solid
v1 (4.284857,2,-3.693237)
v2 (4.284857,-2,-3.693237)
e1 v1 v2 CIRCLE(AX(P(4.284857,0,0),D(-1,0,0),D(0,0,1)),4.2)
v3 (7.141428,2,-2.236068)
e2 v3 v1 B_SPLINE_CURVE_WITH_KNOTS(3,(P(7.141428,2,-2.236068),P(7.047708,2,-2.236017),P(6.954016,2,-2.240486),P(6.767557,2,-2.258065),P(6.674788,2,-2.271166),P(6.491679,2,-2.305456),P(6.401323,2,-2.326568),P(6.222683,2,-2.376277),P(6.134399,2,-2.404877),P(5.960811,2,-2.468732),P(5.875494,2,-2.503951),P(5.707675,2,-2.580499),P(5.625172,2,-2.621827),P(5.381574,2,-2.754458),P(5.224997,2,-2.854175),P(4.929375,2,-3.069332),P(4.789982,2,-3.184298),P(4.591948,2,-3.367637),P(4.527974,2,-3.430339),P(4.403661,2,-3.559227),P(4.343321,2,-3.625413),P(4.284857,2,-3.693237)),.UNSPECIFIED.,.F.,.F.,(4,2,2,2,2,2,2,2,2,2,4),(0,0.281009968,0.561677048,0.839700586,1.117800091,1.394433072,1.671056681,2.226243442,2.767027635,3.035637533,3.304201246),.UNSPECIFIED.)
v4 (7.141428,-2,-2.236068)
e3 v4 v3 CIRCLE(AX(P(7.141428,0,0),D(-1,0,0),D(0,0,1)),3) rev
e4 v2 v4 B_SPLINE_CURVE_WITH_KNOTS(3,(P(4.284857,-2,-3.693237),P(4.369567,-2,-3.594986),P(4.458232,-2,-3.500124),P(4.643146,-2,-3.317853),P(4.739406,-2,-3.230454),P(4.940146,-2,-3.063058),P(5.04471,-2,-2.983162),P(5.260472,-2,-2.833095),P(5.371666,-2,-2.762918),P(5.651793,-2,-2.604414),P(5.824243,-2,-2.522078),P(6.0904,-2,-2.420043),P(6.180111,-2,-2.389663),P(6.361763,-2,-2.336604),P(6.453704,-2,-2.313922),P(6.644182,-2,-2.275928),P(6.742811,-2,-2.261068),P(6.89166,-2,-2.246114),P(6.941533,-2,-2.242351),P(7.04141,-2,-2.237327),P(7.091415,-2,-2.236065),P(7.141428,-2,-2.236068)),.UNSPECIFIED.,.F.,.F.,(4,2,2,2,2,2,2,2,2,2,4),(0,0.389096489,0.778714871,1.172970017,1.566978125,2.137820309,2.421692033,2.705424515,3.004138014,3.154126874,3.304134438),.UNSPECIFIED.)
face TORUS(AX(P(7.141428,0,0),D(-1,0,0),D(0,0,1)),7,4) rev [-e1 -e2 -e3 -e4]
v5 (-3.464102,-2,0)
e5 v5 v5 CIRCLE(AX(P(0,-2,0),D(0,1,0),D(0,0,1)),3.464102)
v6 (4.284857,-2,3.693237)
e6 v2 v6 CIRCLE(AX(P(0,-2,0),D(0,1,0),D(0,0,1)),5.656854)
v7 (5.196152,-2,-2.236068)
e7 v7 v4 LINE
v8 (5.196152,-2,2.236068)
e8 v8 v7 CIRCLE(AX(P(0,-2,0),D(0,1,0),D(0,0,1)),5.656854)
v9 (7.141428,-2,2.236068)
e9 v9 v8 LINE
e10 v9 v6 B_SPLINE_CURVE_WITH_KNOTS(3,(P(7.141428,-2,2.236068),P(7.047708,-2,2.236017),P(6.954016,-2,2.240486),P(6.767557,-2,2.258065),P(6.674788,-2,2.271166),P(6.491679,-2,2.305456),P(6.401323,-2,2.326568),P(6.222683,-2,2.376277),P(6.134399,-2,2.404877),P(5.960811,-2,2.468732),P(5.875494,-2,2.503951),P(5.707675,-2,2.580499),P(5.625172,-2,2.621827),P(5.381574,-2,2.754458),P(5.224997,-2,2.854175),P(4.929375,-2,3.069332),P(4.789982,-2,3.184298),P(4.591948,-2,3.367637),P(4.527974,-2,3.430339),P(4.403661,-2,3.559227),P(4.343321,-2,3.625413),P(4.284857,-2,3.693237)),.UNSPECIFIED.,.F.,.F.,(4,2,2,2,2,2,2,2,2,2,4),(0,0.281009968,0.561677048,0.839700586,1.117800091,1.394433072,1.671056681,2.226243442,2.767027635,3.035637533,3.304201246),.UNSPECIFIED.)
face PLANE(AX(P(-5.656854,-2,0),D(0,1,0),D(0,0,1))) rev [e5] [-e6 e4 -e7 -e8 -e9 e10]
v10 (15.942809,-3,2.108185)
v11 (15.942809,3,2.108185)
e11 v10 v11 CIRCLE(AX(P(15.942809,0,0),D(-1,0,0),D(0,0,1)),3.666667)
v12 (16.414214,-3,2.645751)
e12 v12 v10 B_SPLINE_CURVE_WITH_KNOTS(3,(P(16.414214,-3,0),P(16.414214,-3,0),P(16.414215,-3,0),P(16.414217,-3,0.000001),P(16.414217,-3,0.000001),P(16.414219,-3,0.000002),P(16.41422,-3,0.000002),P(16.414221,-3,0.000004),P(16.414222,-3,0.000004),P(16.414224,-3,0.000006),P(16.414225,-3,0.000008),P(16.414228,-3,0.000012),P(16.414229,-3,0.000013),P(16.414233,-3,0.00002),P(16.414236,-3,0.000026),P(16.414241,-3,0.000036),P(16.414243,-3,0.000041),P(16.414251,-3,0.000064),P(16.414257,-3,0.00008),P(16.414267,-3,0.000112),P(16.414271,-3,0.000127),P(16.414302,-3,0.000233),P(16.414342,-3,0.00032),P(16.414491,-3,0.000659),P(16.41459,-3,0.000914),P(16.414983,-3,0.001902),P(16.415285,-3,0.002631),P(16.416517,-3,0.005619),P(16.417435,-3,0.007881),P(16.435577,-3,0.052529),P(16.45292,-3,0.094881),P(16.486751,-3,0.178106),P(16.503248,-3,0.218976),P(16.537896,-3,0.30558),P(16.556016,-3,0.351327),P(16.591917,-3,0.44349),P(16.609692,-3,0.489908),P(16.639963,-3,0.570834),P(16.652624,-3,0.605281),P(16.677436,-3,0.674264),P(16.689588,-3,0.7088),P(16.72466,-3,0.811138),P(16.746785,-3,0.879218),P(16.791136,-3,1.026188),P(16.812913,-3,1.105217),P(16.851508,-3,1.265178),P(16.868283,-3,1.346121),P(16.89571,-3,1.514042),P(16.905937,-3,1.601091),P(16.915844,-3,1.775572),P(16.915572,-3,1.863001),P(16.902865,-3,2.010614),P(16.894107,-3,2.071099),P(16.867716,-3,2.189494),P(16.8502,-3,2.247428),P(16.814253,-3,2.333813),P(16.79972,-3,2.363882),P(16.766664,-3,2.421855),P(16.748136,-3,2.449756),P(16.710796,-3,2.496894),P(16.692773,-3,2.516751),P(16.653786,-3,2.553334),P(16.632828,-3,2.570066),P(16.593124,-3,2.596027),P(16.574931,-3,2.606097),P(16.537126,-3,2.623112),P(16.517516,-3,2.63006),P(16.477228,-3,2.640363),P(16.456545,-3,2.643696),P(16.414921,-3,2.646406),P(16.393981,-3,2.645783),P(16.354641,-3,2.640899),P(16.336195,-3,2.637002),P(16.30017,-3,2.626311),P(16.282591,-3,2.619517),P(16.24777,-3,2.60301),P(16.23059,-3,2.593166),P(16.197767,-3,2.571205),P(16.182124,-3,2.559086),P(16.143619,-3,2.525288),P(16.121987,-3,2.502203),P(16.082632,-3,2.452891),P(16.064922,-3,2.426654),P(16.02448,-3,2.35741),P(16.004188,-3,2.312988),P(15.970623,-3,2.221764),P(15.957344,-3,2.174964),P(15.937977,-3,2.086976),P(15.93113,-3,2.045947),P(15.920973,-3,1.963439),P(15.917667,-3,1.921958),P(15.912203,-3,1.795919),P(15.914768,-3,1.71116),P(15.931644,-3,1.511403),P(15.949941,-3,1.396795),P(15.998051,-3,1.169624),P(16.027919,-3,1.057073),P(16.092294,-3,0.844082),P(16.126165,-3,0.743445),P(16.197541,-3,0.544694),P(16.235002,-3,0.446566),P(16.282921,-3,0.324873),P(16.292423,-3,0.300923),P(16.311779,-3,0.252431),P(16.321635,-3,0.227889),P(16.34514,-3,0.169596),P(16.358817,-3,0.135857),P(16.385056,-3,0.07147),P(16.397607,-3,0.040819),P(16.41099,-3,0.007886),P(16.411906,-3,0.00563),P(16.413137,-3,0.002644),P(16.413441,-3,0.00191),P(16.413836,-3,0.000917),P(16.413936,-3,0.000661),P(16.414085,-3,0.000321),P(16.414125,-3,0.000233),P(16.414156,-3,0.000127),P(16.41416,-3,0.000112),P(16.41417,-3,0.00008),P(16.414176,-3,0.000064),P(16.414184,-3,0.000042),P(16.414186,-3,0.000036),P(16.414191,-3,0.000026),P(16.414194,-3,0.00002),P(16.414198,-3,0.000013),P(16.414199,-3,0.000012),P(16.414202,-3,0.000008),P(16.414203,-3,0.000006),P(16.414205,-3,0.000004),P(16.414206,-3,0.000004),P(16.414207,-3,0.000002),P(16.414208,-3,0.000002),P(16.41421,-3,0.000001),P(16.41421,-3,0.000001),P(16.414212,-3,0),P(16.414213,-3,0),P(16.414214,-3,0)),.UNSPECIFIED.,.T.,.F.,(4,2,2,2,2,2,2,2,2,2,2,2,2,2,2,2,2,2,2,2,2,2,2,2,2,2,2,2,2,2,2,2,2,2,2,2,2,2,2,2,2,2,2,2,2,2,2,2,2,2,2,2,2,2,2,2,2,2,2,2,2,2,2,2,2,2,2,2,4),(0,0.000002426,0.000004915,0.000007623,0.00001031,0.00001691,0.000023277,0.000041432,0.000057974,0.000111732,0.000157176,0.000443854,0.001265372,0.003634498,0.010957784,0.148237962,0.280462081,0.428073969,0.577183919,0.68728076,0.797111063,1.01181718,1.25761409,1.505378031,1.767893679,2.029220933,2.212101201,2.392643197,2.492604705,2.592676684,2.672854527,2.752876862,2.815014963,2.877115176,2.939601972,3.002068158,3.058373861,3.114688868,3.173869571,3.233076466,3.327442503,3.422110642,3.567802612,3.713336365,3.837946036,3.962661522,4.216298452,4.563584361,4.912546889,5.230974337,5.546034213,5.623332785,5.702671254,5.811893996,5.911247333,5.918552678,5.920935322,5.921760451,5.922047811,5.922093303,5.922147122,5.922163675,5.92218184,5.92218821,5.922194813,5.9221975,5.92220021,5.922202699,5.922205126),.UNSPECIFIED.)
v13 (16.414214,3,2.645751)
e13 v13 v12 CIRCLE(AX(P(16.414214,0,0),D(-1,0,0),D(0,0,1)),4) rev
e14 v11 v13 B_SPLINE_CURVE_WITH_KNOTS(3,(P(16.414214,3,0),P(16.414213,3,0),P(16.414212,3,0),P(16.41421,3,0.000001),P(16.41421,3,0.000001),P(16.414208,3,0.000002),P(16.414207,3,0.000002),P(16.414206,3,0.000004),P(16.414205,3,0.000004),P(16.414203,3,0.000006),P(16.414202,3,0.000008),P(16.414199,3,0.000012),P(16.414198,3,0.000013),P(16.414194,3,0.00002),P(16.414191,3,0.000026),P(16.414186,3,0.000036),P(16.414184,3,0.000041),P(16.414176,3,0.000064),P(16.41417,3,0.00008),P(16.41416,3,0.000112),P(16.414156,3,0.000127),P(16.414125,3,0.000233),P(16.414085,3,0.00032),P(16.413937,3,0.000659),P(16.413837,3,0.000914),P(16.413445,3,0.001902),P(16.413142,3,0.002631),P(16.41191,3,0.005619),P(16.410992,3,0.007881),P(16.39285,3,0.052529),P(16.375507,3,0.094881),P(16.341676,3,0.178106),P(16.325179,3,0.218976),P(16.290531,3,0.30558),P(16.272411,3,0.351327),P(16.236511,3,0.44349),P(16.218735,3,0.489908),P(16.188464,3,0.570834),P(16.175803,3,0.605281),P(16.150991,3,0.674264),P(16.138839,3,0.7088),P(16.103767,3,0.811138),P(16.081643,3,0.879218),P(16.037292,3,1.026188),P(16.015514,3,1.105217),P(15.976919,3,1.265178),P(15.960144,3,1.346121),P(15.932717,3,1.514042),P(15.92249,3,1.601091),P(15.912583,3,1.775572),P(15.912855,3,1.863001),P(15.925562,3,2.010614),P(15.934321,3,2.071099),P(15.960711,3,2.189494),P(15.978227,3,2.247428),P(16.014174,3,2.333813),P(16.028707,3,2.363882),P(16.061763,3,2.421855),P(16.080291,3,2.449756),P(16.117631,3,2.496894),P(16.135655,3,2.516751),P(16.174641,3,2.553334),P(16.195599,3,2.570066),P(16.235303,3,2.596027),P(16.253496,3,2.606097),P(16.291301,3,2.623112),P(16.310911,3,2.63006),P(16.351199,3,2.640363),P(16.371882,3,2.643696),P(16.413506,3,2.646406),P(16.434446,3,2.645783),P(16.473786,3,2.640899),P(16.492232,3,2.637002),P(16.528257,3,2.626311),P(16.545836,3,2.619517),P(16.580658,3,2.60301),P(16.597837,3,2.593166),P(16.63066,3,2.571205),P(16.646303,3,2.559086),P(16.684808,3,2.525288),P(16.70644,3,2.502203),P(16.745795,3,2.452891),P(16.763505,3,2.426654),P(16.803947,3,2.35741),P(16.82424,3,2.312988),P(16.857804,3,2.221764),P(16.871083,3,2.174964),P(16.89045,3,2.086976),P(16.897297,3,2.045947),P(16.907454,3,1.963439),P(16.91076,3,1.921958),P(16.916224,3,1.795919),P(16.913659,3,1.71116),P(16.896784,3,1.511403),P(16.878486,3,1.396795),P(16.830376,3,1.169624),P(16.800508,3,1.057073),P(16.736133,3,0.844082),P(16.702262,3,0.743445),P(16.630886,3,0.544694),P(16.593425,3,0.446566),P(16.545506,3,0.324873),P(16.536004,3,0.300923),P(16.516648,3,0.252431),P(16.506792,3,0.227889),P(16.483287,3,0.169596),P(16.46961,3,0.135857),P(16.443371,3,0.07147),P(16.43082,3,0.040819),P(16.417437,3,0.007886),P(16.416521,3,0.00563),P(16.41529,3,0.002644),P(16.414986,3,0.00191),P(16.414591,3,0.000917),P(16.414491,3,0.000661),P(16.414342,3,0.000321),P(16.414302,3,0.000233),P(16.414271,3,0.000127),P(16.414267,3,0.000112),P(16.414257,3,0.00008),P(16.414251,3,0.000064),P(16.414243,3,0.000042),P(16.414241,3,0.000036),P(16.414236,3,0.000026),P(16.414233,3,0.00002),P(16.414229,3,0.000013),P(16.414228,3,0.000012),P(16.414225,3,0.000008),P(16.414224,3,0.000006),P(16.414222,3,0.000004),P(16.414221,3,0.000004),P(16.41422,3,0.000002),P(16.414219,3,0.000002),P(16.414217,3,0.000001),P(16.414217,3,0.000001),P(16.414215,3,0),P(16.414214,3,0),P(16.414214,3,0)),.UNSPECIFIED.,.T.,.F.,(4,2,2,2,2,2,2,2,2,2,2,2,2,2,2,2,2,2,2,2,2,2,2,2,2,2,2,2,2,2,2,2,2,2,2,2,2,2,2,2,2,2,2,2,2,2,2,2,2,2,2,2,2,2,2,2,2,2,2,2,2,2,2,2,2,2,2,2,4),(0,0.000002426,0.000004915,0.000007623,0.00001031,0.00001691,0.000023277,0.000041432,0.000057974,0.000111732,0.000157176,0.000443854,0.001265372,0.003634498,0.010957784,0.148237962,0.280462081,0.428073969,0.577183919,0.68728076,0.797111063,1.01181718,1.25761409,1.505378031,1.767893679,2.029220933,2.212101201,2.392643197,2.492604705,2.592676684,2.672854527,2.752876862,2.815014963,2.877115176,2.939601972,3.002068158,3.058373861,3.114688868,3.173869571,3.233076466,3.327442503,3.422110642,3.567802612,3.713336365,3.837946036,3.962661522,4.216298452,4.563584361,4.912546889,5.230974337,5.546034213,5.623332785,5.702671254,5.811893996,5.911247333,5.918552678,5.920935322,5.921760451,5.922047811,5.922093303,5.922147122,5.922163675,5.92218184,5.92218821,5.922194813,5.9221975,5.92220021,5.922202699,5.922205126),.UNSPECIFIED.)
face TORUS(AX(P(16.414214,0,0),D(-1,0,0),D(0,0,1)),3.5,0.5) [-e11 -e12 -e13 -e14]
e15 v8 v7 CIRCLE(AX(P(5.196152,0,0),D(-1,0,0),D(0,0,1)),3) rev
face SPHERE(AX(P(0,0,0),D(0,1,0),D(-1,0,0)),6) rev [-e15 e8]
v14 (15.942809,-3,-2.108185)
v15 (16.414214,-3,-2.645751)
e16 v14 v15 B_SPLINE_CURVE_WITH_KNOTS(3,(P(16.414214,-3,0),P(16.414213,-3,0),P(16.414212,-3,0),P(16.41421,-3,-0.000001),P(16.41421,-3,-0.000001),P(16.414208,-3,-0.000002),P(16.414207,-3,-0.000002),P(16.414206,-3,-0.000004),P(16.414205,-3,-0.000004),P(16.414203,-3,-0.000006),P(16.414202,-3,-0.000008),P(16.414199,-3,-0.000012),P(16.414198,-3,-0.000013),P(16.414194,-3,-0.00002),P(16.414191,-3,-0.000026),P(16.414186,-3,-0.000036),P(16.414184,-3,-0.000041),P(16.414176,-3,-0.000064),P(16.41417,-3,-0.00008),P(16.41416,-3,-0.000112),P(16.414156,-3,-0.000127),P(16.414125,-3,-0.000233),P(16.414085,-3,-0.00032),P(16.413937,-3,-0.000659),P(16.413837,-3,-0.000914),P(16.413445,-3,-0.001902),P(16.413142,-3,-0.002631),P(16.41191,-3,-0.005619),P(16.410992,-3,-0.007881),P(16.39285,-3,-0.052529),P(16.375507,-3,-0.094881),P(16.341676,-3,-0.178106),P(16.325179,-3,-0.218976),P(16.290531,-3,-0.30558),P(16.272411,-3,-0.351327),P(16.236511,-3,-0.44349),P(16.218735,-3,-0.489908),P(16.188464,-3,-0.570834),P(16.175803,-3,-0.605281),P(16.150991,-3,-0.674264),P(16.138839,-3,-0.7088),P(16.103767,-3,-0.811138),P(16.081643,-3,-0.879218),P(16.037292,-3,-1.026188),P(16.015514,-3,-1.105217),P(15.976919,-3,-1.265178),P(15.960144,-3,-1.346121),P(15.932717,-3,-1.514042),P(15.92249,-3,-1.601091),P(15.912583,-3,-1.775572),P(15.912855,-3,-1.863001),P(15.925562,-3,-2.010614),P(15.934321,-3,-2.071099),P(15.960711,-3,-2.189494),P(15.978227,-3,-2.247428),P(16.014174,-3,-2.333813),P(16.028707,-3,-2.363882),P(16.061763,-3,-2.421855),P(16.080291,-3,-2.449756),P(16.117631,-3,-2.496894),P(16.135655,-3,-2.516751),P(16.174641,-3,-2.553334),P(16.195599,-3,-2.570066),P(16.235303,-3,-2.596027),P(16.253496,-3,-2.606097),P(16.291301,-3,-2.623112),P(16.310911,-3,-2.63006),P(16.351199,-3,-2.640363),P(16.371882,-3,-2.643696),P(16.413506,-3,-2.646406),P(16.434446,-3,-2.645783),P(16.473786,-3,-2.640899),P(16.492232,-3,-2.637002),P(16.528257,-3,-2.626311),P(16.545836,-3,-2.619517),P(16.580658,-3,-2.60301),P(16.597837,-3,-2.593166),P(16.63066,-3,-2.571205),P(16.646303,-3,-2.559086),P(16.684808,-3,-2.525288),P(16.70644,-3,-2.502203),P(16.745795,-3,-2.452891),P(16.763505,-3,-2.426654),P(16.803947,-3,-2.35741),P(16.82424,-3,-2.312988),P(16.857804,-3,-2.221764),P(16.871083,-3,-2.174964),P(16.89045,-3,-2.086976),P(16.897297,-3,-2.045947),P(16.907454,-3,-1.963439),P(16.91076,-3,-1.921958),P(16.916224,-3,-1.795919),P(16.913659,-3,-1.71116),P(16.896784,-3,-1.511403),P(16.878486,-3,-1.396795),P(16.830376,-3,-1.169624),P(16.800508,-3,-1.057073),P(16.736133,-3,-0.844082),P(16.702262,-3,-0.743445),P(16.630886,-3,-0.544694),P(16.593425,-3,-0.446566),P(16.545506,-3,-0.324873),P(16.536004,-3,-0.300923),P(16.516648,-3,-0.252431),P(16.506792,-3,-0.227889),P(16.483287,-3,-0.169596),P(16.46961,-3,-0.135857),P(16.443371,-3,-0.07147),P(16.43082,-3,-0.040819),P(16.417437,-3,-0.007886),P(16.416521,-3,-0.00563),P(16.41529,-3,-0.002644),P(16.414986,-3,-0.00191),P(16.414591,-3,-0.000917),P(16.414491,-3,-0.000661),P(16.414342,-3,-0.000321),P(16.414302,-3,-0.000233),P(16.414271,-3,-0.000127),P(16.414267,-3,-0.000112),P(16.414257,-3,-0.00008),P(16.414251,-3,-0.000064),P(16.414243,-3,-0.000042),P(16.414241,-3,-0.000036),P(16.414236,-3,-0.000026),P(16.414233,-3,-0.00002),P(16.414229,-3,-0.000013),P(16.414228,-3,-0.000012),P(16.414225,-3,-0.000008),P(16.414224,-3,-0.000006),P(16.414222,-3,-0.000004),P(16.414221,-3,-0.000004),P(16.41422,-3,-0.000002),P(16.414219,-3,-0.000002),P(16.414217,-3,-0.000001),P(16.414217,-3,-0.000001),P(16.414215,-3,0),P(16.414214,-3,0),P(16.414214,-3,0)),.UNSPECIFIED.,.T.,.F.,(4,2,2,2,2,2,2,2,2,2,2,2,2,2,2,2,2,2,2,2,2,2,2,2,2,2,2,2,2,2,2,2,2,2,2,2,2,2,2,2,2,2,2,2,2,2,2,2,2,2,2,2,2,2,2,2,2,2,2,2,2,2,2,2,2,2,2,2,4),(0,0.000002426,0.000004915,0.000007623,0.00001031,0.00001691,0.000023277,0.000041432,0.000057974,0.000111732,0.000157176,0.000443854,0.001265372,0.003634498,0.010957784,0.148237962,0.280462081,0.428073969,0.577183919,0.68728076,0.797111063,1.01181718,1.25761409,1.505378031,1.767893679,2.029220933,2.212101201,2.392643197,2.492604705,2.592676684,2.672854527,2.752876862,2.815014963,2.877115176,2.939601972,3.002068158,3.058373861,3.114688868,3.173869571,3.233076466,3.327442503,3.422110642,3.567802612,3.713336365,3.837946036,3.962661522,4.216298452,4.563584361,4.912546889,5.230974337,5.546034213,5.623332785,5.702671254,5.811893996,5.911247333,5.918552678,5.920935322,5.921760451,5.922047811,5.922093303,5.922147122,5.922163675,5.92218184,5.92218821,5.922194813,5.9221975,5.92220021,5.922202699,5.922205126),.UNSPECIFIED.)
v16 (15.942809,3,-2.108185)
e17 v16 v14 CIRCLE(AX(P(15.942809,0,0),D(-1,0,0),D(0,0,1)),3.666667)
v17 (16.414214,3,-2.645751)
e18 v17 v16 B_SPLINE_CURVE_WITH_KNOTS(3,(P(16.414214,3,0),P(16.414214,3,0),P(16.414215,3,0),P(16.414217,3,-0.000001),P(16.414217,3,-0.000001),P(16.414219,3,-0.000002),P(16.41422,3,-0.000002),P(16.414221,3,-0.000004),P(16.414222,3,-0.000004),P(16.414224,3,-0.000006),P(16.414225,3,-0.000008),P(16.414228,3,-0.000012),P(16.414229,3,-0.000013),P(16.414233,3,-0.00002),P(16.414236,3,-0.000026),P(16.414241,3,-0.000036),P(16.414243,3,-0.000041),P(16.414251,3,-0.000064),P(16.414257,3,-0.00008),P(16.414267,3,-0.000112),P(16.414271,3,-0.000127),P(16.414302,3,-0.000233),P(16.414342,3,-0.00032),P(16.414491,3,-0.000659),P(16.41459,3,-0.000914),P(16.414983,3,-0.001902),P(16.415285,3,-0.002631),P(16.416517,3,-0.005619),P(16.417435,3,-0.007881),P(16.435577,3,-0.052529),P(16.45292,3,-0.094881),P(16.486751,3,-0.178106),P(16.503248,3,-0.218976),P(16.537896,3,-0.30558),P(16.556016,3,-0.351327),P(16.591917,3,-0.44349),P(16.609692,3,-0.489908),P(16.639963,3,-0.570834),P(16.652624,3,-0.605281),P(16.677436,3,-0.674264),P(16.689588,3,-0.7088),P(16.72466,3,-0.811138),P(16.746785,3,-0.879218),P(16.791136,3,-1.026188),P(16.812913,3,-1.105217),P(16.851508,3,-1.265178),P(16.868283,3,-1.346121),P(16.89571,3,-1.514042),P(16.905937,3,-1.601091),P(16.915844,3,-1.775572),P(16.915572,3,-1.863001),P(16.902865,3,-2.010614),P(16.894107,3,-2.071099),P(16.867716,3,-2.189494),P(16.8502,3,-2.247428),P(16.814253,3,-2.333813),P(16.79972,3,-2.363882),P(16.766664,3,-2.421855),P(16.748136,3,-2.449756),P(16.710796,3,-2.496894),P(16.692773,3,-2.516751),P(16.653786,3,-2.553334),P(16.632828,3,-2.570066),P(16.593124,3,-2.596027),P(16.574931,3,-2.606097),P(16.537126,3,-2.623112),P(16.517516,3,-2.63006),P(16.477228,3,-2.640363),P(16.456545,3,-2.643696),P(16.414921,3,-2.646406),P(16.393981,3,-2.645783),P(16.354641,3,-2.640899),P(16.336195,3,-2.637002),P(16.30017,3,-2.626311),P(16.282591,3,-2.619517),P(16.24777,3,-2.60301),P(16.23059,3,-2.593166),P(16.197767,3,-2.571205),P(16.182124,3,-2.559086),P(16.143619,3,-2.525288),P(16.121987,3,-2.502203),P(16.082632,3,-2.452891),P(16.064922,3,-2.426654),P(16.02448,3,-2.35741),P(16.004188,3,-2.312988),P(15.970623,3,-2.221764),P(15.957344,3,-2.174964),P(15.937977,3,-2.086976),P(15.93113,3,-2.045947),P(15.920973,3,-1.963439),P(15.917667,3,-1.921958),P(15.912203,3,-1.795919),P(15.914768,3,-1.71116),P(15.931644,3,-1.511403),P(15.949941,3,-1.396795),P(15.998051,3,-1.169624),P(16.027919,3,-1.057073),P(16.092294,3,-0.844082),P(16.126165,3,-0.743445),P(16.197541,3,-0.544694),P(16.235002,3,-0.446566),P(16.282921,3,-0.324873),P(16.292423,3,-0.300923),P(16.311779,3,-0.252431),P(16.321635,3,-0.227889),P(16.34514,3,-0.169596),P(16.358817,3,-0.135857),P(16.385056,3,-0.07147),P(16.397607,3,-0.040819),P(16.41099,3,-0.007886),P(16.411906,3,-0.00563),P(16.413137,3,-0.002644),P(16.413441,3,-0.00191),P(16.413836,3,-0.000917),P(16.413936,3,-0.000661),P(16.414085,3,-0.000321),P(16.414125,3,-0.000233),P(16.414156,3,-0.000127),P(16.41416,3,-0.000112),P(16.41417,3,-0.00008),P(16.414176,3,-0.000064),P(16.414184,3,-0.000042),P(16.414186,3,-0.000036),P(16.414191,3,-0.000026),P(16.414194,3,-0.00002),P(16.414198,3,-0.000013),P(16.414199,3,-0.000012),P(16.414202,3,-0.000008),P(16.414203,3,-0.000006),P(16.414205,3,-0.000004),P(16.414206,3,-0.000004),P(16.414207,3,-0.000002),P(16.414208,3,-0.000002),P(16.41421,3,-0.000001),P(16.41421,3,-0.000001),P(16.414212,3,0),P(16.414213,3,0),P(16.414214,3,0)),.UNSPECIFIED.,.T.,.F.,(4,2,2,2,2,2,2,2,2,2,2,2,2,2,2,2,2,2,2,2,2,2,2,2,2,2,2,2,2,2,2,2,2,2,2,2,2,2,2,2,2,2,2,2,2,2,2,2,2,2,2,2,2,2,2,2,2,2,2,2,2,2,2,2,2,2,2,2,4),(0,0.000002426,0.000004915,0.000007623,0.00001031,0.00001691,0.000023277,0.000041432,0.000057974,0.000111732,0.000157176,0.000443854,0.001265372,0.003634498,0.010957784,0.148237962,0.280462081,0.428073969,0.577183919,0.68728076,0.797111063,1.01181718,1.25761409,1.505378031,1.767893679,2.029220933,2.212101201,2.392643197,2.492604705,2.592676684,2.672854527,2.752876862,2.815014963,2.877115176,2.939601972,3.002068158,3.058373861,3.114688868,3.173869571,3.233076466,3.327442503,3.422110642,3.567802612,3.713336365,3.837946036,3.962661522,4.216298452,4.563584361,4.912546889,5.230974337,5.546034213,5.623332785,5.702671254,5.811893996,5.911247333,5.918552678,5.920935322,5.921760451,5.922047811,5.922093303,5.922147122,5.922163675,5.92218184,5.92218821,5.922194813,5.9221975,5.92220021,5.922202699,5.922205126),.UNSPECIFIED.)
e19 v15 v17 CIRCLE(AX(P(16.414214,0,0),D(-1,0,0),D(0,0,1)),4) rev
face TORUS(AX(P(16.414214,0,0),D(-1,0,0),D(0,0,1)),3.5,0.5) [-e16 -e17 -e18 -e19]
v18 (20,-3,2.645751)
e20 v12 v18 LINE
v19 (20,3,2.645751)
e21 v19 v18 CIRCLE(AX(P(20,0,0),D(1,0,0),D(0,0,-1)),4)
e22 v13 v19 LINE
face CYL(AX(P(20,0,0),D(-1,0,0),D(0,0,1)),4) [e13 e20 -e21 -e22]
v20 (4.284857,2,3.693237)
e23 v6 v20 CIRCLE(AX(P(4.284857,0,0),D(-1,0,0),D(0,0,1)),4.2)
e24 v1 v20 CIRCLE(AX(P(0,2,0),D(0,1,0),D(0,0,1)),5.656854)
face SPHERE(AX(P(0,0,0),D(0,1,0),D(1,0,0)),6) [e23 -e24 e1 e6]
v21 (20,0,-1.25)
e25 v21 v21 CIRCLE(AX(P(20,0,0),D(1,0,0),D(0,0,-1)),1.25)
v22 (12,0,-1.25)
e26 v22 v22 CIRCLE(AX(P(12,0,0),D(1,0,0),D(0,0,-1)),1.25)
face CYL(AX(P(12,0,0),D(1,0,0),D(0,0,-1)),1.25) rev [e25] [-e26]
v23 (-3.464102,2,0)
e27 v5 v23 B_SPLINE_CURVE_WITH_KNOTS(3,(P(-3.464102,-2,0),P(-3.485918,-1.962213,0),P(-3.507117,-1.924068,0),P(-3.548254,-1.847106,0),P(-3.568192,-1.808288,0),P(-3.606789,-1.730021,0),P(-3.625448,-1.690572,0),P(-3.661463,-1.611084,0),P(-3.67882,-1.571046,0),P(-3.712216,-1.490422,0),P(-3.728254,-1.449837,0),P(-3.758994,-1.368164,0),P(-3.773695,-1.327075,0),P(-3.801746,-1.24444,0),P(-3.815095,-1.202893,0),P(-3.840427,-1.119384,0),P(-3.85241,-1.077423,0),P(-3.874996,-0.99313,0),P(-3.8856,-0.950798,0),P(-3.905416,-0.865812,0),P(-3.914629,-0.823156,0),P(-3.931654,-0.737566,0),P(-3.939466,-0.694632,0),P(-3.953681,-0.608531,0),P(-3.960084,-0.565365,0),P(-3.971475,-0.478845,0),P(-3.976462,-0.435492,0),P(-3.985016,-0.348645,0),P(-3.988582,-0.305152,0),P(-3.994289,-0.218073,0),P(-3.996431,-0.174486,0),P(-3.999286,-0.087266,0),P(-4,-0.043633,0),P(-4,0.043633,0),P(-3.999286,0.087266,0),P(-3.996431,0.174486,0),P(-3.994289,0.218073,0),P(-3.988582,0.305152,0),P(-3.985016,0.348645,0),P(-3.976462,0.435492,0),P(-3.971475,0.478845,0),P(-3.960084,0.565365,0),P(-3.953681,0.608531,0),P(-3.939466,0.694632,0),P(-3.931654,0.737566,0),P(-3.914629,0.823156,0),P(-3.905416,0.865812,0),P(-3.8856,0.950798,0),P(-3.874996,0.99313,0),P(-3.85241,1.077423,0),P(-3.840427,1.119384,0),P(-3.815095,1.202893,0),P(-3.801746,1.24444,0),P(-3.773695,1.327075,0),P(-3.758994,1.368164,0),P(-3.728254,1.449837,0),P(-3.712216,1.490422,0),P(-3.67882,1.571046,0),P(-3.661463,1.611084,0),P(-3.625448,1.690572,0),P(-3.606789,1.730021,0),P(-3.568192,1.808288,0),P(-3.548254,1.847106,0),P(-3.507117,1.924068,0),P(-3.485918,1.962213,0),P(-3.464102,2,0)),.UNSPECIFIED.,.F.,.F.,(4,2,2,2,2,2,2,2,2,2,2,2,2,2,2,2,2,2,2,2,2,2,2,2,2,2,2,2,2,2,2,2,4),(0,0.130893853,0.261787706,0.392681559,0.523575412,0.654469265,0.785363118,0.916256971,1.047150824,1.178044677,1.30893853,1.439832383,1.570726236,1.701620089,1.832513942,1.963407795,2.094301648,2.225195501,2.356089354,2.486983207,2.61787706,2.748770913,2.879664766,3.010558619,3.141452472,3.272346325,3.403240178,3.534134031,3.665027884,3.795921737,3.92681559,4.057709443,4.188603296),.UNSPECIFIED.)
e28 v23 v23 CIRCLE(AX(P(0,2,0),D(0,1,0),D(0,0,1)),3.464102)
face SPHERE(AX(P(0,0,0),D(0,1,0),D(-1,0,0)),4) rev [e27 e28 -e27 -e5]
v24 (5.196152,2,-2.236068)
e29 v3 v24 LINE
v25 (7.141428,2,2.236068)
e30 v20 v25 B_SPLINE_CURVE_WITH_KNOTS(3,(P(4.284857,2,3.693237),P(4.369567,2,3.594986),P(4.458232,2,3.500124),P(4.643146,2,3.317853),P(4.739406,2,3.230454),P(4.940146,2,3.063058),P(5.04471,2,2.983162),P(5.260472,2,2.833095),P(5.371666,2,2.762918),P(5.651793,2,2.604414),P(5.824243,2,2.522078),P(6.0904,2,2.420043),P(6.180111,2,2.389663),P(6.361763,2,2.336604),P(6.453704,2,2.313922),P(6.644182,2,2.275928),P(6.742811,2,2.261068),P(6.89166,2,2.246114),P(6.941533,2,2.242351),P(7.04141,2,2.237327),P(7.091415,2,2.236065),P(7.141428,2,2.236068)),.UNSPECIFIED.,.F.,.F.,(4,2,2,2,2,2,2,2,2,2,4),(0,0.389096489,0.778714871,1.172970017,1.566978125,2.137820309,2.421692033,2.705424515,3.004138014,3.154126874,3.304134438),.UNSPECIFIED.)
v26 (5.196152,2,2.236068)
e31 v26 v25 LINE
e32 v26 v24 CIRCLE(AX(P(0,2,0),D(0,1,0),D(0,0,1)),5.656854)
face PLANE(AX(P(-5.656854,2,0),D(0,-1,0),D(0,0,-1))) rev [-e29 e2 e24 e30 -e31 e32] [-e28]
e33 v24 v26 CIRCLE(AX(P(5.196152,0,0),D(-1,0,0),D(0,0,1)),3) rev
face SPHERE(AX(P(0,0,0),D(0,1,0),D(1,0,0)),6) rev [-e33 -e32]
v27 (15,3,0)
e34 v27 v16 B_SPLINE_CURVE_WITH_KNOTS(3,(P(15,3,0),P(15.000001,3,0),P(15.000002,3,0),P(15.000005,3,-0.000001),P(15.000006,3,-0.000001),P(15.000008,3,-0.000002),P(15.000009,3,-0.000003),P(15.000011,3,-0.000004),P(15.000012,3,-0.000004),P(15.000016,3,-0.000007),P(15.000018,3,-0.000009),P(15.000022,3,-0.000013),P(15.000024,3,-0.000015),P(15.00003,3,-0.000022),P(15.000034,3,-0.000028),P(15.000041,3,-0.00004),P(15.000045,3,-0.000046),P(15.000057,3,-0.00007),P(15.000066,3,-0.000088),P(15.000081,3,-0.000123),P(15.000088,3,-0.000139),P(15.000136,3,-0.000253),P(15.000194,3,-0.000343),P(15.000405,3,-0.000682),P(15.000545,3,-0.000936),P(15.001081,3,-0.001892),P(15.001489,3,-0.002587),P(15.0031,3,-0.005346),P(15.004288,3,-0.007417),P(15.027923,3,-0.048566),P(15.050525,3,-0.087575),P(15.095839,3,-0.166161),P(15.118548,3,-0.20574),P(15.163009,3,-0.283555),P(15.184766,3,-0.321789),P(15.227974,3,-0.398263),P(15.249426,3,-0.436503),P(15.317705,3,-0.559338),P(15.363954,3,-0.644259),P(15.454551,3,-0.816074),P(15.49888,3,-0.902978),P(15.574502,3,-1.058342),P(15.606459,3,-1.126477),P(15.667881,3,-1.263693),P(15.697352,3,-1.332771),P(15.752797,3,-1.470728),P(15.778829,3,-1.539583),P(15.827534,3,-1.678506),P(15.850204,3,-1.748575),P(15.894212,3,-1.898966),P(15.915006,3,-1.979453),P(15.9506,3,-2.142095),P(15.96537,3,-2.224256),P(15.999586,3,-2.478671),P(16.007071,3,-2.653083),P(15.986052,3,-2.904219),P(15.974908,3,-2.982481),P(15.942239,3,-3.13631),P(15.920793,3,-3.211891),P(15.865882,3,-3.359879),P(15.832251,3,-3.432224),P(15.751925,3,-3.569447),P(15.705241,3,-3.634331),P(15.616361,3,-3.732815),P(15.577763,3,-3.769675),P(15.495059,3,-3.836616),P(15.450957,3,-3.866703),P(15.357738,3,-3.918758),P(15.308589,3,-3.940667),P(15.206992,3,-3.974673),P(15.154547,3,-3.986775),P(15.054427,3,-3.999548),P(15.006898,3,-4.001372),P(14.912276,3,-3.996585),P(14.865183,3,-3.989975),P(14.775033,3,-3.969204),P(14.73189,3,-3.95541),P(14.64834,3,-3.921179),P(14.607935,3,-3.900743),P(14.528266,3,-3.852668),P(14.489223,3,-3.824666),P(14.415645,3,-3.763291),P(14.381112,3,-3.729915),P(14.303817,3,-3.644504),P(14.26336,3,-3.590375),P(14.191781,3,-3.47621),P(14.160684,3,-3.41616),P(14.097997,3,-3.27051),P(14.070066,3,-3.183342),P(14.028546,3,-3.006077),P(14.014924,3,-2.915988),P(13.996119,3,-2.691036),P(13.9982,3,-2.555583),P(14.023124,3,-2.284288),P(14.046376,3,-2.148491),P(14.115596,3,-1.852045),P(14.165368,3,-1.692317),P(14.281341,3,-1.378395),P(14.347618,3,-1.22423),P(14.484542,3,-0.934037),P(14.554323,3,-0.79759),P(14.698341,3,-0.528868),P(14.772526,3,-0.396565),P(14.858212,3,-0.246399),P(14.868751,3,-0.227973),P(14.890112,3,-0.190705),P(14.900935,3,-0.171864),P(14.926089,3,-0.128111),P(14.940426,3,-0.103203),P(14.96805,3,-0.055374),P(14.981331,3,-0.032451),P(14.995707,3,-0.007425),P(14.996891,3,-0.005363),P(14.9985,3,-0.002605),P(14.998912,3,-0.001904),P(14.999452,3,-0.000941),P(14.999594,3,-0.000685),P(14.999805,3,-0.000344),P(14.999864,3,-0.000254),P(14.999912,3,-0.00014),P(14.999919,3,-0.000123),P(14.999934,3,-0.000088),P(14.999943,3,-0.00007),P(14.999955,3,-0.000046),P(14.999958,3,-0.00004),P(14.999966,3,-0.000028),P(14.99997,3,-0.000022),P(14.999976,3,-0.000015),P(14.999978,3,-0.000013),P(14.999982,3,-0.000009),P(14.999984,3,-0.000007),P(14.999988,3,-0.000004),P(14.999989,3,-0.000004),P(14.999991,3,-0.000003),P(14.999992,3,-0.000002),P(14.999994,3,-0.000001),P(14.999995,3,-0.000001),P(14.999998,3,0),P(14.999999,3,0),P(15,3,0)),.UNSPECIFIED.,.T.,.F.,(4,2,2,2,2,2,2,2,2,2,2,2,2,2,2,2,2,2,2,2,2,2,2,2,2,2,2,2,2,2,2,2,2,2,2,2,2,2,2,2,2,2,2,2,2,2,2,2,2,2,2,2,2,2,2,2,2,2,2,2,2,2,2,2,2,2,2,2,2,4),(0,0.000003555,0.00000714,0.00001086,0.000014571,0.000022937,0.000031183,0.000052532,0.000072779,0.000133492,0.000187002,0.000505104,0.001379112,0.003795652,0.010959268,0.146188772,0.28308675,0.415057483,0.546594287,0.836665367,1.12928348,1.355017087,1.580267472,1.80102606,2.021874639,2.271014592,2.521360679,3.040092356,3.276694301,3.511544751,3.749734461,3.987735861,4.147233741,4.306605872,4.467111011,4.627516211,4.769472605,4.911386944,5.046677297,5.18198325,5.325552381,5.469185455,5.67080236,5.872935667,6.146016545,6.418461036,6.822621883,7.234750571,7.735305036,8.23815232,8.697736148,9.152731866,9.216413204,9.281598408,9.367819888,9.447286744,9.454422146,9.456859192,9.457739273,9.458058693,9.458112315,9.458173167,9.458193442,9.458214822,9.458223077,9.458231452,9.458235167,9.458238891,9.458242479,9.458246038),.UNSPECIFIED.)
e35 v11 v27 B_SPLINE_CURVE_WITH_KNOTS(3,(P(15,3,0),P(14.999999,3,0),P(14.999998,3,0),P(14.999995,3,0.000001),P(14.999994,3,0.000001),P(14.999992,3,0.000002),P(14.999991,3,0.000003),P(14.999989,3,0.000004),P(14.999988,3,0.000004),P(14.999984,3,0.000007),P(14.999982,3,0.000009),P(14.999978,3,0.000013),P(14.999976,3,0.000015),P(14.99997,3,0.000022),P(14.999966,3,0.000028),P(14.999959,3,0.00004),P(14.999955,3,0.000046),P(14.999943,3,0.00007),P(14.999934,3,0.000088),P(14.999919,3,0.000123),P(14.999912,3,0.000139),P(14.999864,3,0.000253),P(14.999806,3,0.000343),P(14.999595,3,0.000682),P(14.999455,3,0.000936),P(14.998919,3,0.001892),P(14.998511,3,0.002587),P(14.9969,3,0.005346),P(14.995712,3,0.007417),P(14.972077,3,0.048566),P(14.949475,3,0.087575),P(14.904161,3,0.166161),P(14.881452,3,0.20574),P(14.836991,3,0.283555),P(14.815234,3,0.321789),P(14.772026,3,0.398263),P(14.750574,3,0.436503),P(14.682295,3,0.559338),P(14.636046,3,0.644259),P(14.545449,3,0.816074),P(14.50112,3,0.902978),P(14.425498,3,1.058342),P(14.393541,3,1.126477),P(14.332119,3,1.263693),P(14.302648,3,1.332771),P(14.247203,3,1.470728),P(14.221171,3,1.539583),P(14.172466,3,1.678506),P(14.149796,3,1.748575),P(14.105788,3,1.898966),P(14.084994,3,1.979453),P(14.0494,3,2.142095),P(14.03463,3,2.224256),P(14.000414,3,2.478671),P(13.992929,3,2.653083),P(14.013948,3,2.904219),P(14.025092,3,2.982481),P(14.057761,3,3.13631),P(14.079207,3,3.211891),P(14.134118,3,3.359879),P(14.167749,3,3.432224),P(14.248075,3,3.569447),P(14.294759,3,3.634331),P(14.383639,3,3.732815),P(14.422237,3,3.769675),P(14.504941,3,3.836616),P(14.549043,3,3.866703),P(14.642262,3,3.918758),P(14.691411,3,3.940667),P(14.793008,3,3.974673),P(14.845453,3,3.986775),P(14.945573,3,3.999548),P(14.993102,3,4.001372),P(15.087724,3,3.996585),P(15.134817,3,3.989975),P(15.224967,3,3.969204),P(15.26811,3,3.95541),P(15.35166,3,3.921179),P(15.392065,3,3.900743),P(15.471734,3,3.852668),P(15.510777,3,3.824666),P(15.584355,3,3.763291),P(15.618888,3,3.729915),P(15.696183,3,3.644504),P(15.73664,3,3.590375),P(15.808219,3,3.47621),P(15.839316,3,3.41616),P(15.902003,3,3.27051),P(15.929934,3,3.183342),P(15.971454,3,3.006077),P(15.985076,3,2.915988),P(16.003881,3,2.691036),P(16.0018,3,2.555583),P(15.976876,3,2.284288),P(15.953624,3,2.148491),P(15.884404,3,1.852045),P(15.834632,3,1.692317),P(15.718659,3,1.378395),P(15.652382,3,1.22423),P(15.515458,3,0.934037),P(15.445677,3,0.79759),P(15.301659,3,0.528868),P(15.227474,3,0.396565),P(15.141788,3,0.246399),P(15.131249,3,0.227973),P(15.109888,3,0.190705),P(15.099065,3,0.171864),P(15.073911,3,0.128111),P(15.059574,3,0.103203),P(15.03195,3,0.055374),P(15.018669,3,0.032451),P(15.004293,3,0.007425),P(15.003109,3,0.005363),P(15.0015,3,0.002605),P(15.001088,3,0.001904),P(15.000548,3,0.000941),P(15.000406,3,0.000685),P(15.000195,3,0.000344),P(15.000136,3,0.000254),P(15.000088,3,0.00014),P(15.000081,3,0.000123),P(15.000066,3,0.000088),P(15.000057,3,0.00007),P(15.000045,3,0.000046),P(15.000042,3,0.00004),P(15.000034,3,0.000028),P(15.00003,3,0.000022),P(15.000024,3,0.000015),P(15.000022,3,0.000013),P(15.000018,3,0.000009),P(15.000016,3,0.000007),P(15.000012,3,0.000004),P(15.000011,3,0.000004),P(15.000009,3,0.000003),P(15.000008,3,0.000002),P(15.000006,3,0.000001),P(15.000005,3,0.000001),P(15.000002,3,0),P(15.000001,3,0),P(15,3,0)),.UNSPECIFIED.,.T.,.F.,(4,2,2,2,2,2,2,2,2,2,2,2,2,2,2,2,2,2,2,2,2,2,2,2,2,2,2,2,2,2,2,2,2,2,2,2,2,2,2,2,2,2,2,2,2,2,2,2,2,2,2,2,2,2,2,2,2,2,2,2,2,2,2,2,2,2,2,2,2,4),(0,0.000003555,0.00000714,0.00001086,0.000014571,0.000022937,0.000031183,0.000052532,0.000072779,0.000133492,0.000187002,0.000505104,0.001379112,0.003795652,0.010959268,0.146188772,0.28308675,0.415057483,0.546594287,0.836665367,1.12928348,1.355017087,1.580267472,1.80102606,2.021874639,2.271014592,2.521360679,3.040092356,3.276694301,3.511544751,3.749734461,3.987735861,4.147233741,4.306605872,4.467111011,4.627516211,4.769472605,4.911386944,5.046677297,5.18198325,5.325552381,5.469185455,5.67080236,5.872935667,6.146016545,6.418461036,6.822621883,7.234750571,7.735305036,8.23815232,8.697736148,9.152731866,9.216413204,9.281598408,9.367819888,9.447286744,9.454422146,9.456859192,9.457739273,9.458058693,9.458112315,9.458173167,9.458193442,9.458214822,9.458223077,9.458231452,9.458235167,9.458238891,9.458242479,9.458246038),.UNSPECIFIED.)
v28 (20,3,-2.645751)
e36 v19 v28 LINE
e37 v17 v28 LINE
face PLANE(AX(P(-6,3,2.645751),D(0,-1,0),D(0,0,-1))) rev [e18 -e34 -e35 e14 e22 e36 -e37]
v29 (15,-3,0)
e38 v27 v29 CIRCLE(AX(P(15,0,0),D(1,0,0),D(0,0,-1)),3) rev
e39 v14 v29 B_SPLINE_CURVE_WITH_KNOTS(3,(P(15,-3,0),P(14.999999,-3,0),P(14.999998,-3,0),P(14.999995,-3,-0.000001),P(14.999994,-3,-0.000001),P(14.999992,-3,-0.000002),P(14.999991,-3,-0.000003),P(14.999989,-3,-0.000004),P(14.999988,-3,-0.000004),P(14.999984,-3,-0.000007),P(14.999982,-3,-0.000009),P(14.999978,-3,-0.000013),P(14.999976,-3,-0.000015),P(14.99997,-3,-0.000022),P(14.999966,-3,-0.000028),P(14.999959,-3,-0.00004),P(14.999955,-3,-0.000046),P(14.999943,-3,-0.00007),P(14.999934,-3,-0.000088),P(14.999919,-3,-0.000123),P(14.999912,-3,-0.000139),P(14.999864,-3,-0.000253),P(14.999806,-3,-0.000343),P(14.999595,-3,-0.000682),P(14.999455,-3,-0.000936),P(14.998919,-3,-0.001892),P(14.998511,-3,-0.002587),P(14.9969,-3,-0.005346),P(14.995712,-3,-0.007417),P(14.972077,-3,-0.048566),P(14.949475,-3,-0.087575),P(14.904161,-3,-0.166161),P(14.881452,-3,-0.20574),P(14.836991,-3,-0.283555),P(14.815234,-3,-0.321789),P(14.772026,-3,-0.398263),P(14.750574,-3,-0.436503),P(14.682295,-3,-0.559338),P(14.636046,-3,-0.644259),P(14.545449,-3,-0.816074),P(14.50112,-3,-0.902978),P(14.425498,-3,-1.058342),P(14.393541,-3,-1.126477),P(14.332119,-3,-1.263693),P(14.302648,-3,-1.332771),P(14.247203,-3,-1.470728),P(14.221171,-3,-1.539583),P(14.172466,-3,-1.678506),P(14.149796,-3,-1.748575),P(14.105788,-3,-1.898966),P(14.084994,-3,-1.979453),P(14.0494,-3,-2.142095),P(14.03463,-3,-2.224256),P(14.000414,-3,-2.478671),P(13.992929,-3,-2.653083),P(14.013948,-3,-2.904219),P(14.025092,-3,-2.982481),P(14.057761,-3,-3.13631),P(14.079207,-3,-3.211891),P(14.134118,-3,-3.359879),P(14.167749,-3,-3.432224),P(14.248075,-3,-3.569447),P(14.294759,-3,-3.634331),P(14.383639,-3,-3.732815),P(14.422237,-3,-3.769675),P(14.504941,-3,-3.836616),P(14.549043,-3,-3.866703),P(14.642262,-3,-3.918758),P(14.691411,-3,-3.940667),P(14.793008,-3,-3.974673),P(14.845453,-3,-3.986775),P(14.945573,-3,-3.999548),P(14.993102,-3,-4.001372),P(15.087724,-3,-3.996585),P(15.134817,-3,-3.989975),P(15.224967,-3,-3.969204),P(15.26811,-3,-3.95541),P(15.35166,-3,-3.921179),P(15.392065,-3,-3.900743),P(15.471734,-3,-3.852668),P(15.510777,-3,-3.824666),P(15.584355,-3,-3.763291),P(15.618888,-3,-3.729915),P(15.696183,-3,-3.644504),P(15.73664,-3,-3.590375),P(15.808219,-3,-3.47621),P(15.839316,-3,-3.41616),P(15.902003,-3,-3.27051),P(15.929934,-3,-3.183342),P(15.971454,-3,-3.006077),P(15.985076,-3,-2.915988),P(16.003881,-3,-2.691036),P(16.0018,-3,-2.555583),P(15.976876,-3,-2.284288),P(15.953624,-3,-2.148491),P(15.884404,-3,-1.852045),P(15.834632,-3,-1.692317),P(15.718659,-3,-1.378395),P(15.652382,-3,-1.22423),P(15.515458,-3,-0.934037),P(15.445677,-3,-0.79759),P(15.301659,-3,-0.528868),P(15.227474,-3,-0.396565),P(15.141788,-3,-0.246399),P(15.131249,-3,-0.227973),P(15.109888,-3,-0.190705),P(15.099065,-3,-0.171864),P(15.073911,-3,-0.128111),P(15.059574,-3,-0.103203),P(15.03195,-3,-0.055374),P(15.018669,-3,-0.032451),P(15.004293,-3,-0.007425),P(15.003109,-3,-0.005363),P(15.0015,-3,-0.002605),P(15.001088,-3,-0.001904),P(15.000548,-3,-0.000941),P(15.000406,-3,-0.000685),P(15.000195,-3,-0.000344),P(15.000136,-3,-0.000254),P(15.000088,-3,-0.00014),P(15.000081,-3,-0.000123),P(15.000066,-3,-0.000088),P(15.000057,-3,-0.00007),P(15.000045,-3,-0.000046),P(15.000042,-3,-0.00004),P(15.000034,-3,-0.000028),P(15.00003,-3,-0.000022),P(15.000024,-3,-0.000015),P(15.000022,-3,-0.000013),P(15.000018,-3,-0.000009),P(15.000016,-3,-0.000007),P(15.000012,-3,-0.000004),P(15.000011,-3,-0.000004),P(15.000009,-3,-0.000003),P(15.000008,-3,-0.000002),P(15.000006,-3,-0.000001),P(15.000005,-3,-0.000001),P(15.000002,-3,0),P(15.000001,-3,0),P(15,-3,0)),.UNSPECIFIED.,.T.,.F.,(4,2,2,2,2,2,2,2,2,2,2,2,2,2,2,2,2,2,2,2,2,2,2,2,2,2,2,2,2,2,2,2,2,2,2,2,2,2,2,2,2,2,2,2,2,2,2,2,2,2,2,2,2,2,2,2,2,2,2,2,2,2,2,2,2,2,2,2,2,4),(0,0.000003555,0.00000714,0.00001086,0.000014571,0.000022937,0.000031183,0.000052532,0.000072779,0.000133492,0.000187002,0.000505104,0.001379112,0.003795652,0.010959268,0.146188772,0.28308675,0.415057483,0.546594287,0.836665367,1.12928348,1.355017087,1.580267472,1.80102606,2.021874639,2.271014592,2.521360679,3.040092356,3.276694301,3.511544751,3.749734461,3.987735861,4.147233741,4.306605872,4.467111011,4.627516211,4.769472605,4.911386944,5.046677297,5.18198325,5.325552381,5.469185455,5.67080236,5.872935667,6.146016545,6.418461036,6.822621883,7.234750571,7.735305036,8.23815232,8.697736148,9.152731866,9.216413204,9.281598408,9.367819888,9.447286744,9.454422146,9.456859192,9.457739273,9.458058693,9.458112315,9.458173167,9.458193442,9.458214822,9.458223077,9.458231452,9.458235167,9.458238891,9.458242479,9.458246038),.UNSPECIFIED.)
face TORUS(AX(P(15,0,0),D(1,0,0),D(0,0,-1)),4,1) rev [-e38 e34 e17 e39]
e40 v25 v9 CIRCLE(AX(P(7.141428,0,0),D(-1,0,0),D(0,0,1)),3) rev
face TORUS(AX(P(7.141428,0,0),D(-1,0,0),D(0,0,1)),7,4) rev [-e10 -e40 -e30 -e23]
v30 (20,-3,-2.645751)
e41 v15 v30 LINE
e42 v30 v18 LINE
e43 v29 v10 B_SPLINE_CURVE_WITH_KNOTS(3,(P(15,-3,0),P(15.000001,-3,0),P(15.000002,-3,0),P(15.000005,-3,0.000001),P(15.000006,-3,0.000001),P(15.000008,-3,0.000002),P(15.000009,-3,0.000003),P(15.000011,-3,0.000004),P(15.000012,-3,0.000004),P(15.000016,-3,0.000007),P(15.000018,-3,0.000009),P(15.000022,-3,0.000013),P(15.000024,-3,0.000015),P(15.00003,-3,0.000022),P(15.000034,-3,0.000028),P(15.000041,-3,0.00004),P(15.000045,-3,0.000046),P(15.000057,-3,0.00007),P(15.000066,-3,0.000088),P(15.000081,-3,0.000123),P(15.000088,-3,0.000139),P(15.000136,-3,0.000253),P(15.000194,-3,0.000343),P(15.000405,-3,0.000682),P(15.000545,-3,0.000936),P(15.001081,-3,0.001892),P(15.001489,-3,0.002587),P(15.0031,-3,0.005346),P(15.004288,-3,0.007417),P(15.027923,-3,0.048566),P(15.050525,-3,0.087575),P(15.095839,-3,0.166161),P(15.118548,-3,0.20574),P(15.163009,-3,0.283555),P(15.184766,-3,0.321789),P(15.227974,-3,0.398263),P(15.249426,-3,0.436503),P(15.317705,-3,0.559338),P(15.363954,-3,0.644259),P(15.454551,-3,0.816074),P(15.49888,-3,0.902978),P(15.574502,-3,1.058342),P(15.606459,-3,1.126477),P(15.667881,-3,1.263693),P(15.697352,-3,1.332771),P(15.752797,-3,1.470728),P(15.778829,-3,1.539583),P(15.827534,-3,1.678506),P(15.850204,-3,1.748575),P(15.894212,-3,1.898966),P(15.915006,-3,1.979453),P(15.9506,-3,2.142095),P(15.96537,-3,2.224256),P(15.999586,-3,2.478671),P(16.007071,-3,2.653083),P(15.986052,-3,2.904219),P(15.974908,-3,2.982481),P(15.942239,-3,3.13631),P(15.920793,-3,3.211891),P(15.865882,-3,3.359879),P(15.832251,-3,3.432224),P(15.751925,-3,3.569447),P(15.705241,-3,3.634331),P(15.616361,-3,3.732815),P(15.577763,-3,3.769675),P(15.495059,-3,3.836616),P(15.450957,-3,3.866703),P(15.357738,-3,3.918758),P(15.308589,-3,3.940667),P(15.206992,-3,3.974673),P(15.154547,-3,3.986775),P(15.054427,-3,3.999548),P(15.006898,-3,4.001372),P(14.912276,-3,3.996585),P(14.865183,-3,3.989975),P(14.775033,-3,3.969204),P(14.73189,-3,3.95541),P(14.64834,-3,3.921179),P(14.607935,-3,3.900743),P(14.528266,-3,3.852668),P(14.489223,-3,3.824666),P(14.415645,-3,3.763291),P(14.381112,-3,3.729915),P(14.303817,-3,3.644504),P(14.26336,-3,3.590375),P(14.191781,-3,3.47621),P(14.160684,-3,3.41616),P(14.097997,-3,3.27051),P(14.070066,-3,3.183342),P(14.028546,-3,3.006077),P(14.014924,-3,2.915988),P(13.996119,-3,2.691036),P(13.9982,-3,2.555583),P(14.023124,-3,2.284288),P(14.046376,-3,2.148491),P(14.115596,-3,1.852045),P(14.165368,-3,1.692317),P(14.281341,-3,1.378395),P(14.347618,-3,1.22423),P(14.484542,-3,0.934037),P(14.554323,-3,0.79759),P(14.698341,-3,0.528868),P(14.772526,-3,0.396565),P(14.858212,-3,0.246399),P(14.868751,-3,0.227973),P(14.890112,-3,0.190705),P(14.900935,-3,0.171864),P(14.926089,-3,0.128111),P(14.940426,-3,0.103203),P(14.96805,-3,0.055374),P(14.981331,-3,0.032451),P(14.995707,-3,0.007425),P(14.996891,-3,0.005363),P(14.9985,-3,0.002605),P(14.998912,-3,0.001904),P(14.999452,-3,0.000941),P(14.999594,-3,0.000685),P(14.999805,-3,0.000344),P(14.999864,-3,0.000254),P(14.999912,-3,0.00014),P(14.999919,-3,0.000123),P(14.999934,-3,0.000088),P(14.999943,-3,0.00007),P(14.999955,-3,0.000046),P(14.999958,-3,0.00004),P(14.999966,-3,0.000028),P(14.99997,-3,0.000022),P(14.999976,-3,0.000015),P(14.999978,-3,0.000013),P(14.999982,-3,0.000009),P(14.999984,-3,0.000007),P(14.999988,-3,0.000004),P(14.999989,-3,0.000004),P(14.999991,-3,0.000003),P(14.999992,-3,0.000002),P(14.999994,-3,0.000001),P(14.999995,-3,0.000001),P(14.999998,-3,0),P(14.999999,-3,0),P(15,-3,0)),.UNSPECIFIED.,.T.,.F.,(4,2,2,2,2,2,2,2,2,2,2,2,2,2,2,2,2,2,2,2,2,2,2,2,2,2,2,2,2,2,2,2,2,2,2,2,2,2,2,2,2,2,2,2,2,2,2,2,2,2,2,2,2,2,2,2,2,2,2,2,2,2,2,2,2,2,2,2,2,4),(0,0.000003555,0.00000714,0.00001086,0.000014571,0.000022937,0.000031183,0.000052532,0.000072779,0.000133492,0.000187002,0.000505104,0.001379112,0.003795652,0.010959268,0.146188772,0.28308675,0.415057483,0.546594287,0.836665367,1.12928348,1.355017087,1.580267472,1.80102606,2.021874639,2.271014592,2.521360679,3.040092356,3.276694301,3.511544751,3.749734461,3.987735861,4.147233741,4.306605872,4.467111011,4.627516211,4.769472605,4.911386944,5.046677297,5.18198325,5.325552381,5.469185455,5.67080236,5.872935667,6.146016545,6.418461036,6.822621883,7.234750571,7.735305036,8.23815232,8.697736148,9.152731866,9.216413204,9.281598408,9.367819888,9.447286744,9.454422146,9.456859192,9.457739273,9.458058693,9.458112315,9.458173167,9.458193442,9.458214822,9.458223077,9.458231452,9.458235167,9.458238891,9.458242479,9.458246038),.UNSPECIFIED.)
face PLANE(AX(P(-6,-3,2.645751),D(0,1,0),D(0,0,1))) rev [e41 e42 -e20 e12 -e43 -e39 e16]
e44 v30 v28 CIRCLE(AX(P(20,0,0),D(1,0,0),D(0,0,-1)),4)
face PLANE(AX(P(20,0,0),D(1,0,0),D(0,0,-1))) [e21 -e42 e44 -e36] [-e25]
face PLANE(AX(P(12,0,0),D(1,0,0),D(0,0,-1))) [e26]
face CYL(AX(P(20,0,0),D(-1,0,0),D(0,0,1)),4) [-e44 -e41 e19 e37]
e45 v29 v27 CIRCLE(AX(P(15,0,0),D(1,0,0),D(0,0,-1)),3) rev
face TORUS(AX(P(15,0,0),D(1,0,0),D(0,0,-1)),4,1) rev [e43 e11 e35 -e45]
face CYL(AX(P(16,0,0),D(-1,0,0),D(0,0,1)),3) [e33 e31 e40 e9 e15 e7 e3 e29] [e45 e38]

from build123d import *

# Parameters (mm, degrees)
SKETCH_2_R          = 3
EXTRUDE_1_DEPTH     = 16
SKETCH_6_R          = 4
EXTRUDE_2_DEPTH     = 4
FILLET_1_R          = 1
FILLET_2_R          = 0.5
CUT_EXTRUDE_1_DEPTH = 27.981475869
FILLET_3_R          = 4
SKETCH_8_R          = 1.25
CUT_EXTRUDE_2_DEPTH = 8


# Some blends are built 0.0001 mm under size
with BuildPart() as part:
    # 草图1 → 旋转1 (revolve)
    with BuildSketch(Plane.XY):
        with BuildLine():
            Line((0, 6), (0, -6))
            ThreePointArc((0, -6), (6, 0), (0, 6))
        make_face()
    revolve(axis=Axis((0, 6, 0), (0, -1, 0)))

    # 草图2 → 凸台-拉伸1 (add)
    with BuildSketch(Plane(origin=(0, 0, 0), x_dir=(0, 0, -1), z_dir=(1, 0, 0))):
        with Locations(Location((0, 0, 0), (0, 0, 180))):
            Circle(SKETCH_2_R)
    extrude(amount=EXTRUDE_1_DEPTH)

    # 草图4 → 切除-旋转1 (revolve, cut)
    with BuildSketch(Plane.XY):
        with BuildLine():
            Line((0, 6), (0, -6))
            ThreePointArc((0, -6), (-3.464101615, -4.898979486), (-5.656854249, -2))
            Line((-5.656854249, -2), (-3.464101615, -2))
            ThreePointArc((-3.464101615, -2), (-4, 0), (-3.464101615, 2))
            Line((-3.464101615, 2), (-5.656854249, 2))
            ThreePointArc((-5.656854249, 2), (-3.464101615, 4.898979486), (0, 6))
        make_face()
    revolve(axis=Axis((0, 13.897588957, 0), (0, -1, 0)), mode=Mode.SUBTRACT)

    # 草图6 → 凸台-拉伸2 (add)
    with BuildSketch(Plane(origin=(16, 0, 0), x_dir=(0, 0, -1), z_dir=(1, 0, 0))):
        Circle(SKETCH_6_R)
    extrude(amount=EXTRUDE_2_DEPTH)

    # 圆角1
    fillet_1_edges = [part.edges().sort_by_distance(p)[0] for p in [
        (16, 0, -3),
    ]]
    fillet(fillet_1_edges, radius=FILLET_1_R - 0.0001)  # a hair under: the kernel refuses the full size

    # 圆角2
    fillet_2_edges = [part.edges().sort_by_distance(p)[0] for p in [
        (16, 0, 4),
    ]]
    fillet(fillet_2_edges, radius=FILLET_2_R)

    # 草图7 → 切除-拉伸1 (cut, through all)
    with BuildSketch(Plane(origin=(20, 0, 0), x_dir=(0, 0, -1), z_dir=(1, 0, 0))):
        with BuildLine():
            Line((-2.645751311, 3), (2.645751311, 3))
            ThreePointArc((2.645751311, 3), (0, 4), (-2.645751311, 3))
        make_face()
        with BuildLine():
            Line((-2.645751311, -3), (2.645751311, -3))
            ThreePointArc((2.645751311, -3), (0, -4), (-2.645751311, -3))
        make_face()
    extrude(amount=-CUT_EXTRUDE_1_DEPTH, mode=Mode.SUBTRACT)

    # 圆角3
    # the kernel refuses this fillet: 4 mm, written as the material it adds along each edge
    with BuildSketch(Plane(origin=(5.196152423, 0, 0), x_dir=(0, 0.710521844411638, 0.7036751442348125), z_dir=(0, -0.7036751442348125, 0.710521844411638))) as fillet_3_piece_1_section:
        with BuildLine():
            CenterArc((7, -1.945276006), FILLET_3_R, 134.427004001, 45.572995999)
            ThreePointArc((4.2, 0.911295366), (3.628720823, 0.417827906), (3, 0))
            Line((3, 0), (3, -1.945276006))
        make_face()
    fillet_3_piece_1 = revolve(axis=Axis((5.196152423, 0, 0), (-1, 0, 0)), revolution_arc=269.445220203, mode=Mode.PRIVATE)
    fillet_3_piece_1 = split(fillet_3_piece_1, bisect_by=Plane(origin=(5.196152423, -2, 0), z_dir=(0, 1, 0)), keep=Keep.TOP, mode=Mode.PRIVATE)
    fillet_3_piece_1 = split(fillet_3_piece_1, bisect_by=Plane(origin=(5.196152423, 2, 0), z_dir=(0, -1, 0)), keep=Keep.TOP, mode=Mode.PRIVATE)
    add(fillet_3_piece_1)
    with BuildSketch(Plane(origin=(5.196152423, 0, 0), x_dir=(0, -0.7108184662614588, -0.7033755099672631), z_dir=(0, 0.7033755099672631, -0.7108184662614588))) as fillet_3_piece_2_section:
        with BuildLine():
            CenterArc((7, -1.945276006), FILLET_3_R, 134.427004001, 45.572995999)
            ThreePointArc((4.2, 0.911295366), (3.628720823, 0.417827906), (3, 0))
            Line((3, 0), (3, -1.945276006))
        make_face()
    fillet_3_piece_2 = revolve(axis=Axis((5.196152423, 0, 0), (-1, 0, 0)), revolution_arc=134.698452933, mode=Mode.PRIVATE)
    fillet_3_piece_2 = split(fillet_3_piece_2, bisect_by=Plane(origin=(5.196152423, -2, 0), z_dir=(0, 1, 0)), keep=Keep.TOP, mode=Mode.PRIVATE)
    add(fillet_3_piece_2)
    with BuildSketch(Plane(origin=(5.196152423, 0, 0), x_dir=(0, 0, 1), z_dir=(0, -1, 0))) as fillet_3_piece_3_section:
        with BuildLine():
            CenterArc((7, -1.945276006), FILLET_3_R, 134.427004001, 45.572995999)
            ThreePointArc((4.2, 0.911295366), (3.628720823, 0.417827906), (3, 0))
            Line((3, 0), (3, -1.945276006))
        make_face()
    fillet_3_piece_3 = revolve(axis=Axis((5.196152423, 0, 0), (-1, 0, 0)), revolution_arc=134.698452933, mode=Mode.PRIVATE)
    fillet_3_piece_3 = split(fillet_3_piece_3, bisect_by=Plane(origin=(5.196152423, 2, 0), z_dir=(0, -1, 0)), keep=Keep.TOP, mode=Mode.PRIVATE)
    add(fillet_3_piece_3)

    # 草图8 → 切除-拉伸2 (cut)
    with BuildSketch(Plane(origin=(20, 0, 0), x_dir=(0, 0, -1), z_dir=(1, 0, 0))):
        Circle(SKETCH_8_R)
    extrude(amount=-CUT_EXTRUDE_2_DEPTH, mode=Mode.SUBTRACT)


solid = part.part
